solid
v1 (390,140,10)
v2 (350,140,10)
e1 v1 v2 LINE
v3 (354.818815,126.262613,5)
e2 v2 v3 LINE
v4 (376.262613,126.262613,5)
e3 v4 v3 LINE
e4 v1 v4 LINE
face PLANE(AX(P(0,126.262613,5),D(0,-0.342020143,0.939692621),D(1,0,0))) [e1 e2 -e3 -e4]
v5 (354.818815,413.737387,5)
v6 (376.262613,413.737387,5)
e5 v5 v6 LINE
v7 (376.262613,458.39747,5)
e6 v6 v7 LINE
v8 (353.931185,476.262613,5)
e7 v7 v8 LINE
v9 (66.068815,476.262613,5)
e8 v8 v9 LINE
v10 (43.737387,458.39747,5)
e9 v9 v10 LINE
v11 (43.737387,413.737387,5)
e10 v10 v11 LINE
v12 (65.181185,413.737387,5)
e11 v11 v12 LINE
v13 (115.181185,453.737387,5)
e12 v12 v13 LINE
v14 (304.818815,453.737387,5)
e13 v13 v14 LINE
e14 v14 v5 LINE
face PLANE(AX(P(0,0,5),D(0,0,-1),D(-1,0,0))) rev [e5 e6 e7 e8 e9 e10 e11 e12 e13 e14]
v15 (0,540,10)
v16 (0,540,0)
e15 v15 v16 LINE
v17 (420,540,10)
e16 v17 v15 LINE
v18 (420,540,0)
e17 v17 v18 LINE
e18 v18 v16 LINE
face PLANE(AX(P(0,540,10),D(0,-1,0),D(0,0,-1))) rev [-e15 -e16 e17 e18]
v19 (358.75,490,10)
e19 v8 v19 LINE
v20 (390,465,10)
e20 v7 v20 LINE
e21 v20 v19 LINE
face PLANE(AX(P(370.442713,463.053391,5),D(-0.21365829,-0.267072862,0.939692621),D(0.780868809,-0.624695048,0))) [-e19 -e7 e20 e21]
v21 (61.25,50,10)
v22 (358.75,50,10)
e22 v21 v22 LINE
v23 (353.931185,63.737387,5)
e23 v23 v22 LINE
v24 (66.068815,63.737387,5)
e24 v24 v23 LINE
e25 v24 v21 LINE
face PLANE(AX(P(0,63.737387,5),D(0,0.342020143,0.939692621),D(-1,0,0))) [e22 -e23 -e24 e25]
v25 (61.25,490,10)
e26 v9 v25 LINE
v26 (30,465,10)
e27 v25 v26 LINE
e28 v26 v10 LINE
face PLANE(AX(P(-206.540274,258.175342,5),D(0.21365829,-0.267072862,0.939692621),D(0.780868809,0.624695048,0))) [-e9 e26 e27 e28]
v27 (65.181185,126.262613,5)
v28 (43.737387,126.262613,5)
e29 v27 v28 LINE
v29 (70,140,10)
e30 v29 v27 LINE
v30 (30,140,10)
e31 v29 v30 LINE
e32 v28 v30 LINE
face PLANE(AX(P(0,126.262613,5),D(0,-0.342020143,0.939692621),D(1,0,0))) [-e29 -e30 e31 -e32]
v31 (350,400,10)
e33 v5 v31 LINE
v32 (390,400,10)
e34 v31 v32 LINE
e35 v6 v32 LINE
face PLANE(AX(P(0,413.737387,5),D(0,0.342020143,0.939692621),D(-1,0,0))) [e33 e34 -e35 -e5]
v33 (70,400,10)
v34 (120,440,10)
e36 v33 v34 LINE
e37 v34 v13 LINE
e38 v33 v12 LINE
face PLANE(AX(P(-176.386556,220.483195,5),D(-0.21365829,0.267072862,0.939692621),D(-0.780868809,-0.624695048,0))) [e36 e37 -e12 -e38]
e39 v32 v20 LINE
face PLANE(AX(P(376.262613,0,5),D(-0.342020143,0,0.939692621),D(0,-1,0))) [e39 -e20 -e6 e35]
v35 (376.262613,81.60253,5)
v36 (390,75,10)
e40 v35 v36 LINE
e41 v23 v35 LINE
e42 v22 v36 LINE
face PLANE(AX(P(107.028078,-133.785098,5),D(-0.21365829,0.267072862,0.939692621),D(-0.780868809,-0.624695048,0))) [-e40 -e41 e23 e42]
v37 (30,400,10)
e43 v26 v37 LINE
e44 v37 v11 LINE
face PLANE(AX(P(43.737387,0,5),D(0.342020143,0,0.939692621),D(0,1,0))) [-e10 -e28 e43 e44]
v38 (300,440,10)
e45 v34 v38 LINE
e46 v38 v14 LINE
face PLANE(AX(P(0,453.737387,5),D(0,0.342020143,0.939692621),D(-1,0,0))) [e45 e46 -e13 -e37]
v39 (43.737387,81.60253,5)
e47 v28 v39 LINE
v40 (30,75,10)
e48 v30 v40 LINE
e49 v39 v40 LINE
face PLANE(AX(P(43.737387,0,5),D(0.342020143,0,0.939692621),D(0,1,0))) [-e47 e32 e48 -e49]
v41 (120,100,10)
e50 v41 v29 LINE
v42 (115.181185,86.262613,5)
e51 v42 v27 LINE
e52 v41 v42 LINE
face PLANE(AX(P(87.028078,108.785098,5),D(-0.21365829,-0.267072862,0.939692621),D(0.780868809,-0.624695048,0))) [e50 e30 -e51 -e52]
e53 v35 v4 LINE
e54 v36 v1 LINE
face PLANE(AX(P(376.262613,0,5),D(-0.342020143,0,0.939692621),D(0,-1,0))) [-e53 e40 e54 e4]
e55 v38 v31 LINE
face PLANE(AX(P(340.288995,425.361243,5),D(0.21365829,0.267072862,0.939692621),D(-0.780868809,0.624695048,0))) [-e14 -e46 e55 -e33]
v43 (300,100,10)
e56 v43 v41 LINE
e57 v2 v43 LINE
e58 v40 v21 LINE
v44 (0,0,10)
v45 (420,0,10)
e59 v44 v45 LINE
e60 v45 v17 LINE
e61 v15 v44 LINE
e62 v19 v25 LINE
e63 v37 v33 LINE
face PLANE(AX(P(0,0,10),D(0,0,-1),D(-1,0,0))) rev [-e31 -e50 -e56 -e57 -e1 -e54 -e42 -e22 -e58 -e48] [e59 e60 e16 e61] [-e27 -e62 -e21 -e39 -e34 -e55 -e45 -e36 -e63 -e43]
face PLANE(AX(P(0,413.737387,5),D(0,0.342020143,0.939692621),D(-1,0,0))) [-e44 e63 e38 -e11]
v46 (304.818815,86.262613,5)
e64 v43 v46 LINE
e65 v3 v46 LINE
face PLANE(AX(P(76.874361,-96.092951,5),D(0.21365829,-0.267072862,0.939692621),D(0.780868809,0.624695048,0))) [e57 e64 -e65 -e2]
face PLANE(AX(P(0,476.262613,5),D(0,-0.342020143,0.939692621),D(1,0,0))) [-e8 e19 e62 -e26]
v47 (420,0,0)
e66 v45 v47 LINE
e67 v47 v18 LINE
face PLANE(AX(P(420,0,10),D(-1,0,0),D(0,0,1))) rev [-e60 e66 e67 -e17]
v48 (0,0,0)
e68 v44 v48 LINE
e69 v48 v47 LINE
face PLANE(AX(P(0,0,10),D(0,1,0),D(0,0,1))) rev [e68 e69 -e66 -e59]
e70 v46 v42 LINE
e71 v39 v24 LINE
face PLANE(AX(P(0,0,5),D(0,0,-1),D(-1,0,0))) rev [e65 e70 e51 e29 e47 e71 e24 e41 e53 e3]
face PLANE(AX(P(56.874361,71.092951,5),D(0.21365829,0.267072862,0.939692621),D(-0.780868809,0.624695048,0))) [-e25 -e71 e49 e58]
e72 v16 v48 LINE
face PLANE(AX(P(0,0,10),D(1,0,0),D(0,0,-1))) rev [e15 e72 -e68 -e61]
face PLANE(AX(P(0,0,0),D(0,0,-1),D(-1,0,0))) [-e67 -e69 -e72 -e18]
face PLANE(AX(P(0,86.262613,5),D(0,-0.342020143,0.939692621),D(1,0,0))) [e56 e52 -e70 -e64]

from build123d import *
from OCP.BRepFilletAPI import BRepFilletAPI_MakeChamfer

# Parameters (mm, degrees)
ESQUISSE1_W             = 420
ESQUISSE1_H             = 540
BOSS_EXTRU_1_DEPTH      = 10
ENL_V_MAT_EXTRU_1_DEPTH = 5
CHANFREIN1_SIZE         = 5
CHANFREIN1_SIZE_2       = 13.737387097


with BuildPart() as part:
    # Esquisse1 → Boss.-Extru.1 (new body)
    with BuildSketch(Plane.XY):
        with Locations((210, 270)):
            Rectangle(ESQUISSE1_W, ESQUISSE1_H)
    extrude(amount=BOSS_EXTRU_1_DEPTH)

    # Esquisse2 → Enlèv. mat.-Extru.1 (cut)
    with BuildSketch(Plane.XY.offset(10)):
        Polygon((300, 100), (120, 100), (70, 140), (30, 140), (30, 75), (61.25, 50), (358.75, 50), (390, 75), (390, 140), (350, 140), align=None)
        Polygon((30, 465), (61.25, 490), (358.75, 490), (390, 465), (390, 400), (350, 400), (300, 440), (120, 440), (70, 400), (30, 400), align=None)
    extrude(amount=-ENL_V_MAT_EXTRU_1_DEPTH, mode=Mode.SUBTRACT)

    # Chanfrein1
    chanfrein1_edges_1 = [part.edges().sort_by_distance(p)[0] for p in [
        (390, 107.5, 5),
    ]]
    chanfrein1_side_1 = [part.faces().sort_by_distance(p)[0] for p in [
        (390, 107.5, 5.1),
    ]]
    chanfrein1_edges_2 = [part.edges().sort_by_distance(p)[0] for p in [
        (374.375, 62.5, 5),
    ]]
    chanfrein1_side_2 = [part.faces().sort_by_distance(p)[0] for p in [
        (374.375, 62.5, 5.1),
    ]]
    chanfrein1_edges_3 = [part.edges().sort_by_distance(p)[0] for p in [
        (210, 50, 5),
    ]]
    chanfrein1_side_3 = [part.faces().sort_by_distance(p)[0] for p in [
        (210, 50, 5.1),
    ]]
    chanfrein1_edges_4 = [part.edges().sort_by_distance(p)[0] for p in [
        (45.625, 62.5, 5),
    ]]
    chanfrein1_side_4 = [part.faces().sort_by_distance(p)[0] for p in [
        (45.625, 62.5, 5.1),
    ]]
    chanfrein1_edges_5 = [part.edges().sort_by_distance(p)[0] for p in [
        (30, 107.5, 5),
    ]]
    chanfrein1_side_5 = [part.faces().sort_by_distance(p)[0] for p in [
        (30, 107.5, 5.1),
    ]]
    chanfrein1_edges_6 = [part.edges().sort_by_distance(p)[0] for p in [
        (50, 140, 5),
    ]]
    chanfrein1_side_6 = [part.faces().sort_by_distance(p)[0] for p in [
        (50, 140, 5.1),
    ]]
    chanfrein1_edges_7 = [part.edges().sort_by_distance(p)[0] for p in [
        (95, 120, 5),
    ]]
    chanfrein1_side_7 = [part.faces().sort_by_distance(p)[0] for p in [
        (95, 120, 5.1),
    ]]
    chanfrein1_edges_8 = [part.edges().sort_by_distance(p)[0] for p in [
        (210, 100, 5),
    ]]
    chanfrein1_side_8 = [part.faces().sort_by_distance(p)[0] for p in [
        (210, 100, 5.1),
    ]]
    chanfrein1_edges_9 = [part.edges().sort_by_distance(p)[0] for p in [
        (325, 120, 5),
    ]]
    chanfrein1_side_9 = [part.faces().sort_by_distance(p)[0] for p in [
        (325, 120, 5.1),
    ]]
    chanfrein1_edges_10 = [part.edges().sort_by_distance(p)[0] for p in [
        (370, 140, 5),
    ]]
    chanfrein1_side_10 = [part.faces().sort_by_distance(p)[0] for p in [
        (370, 140, 5.1),
    ]]
    chanfrein1_edges_11 = [part.edges().sort_by_distance(p)[0] for p in [
        (45.625, 477.5, 5),
    ]]
    chanfrein1_side_11 = [part.faces().sort_by_distance(p)[0] for p in [
        (45.625, 477.5, 5.1),
    ]]
    chanfrein1_edges_12 = [part.edges().sort_by_distance(p)[0] for p in [
        (210, 490, 5),
    ]]
    chanfrein1_side_12 = [part.faces().sort_by_distance(p)[0] for p in [
        (210, 490, 5.1),
    ]]
    chanfrein1_edges_13 = [part.edges().sort_by_distance(p)[0] for p in [
        (374.375, 477.5, 5),
    ]]
    chanfrein1_side_13 = [part.faces().sort_by_distance(p)[0] for p in [
        (374.375, 477.5, 5.1),
    ]]
    chanfrein1_edges_14 = [part.edges().sort_by_distance(p)[0] for p in [
        (390, 432.5, 5),
    ]]
    chanfrein1_side_14 = [part.faces().sort_by_distance(p)[0] for p in [
        (390, 432.5, 5.1),
    ]]
    chanfrein1_edges_15 = [part.edges().sort_by_distance(p)[0] for p in [
        (370, 400, 5),
    ]]
    chanfrein1_side_15 = [part.faces().sort_by_distance(p)[0] for p in [
        (370, 400, 5.1),
    ]]
    chanfrein1_edges_16 = [part.edges().sort_by_distance(p)[0] for p in [
        (325, 420, 5),
    ]]
    chanfrein1_side_16 = [part.faces().sort_by_distance(p)[0] for p in [
        (325, 420, 5.1),
    ]]
    chanfrein1_edges_17 = [part.edges().sort_by_distance(p)[0] for p in [
        (210, 440, 5),
    ]]
    chanfrein1_side_17 = [part.faces().sort_by_distance(p)[0] for p in [
        (210, 440, 5.1),
    ]]
    chanfrein1_edges_18 = [part.edges().sort_by_distance(p)[0] for p in [
        (95, 420, 5),
    ]]
    chanfrein1_side_18 = [part.faces().sort_by_distance(p)[0] for p in [
        (95, 420, 5.1),
    ]]
    chanfrein1_edges_19 = [part.edges().sort_by_distance(p)[0] for p in [
        (50, 400, 5),
    ]]
    chanfrein1_side_19 = [part.faces().sort_by_distance(p)[0] for p in [
        (50, 400, 5.1),
    ]]
    chanfrein1_edges_20 = [part.edges().sort_by_distance(p)[0] for p in [
        (30, 432.5, 5),
    ]]
    chanfrein1_side_20 = [part.faces().sort_by_distance(p)[0] for p in [
        (30, 432.5, 5.1),
    ]]
    chanfrein1 = BRepFilletAPI_MakeChamfer(part.part.solid().wrapped)
    for e in chanfrein1_edges_1:
        chanfrein1.Add(CHANFREIN1_SIZE - 0.0001, CHANFREIN1_SIZE_2 - 0.0001, e.wrapped, chanfrein1_side_1[0].wrapped)
    for e in chanfrein1_edges_2:
        chanfrein1.Add(CHANFREIN1_SIZE - 0.0001, CHANFREIN1_SIZE_2 - 0.0001, e.wrapped, chanfrein1_side_2[0].wrapped)
    for e in chanfrein1_edges_3:
        chanfrein1.Add(CHANFREIN1_SIZE - 0.0001, CHANFREIN1_SIZE_2 - 0.0001, e.wrapped, chanfrein1_side_3[0].wrapped)
    for e in chanfrein1_edges_4:
        chanfrein1.Add(CHANFREIN1_SIZE - 0.0001, CHANFREIN1_SIZE_2 - 0.0001, e.wrapped, chanfrein1_side_4[0].wrapped)
    for e in chanfrein1_edges_5:
        chanfrein1.Add(CHANFREIN1_SIZE - 0.0001, CHANFREIN1_SIZE_2 - 0.0001, e.wrapped, chanfrein1_side_5[0].wrapped)
    for e in chanfrein1_edges_6:
        chanfrein1.Add(CHANFREIN1_SIZE - 0.0001, CHANFREIN1_SIZE_2 - 0.0001, e.wrapped, chanfrein1_side_6[0].wrapped)
    for e in chanfrein1_edges_7:
        chanfrein1.Add(CHANFREIN1_SIZE - 0.0001, CHANFREIN1_SIZE_2 - 0.0001, e.wrapped, chanfrein1_side_7[0].wrapped)
    for e in chanfrein1_edges_8:
        chanfrein1.Add(CHANFREIN1_SIZE - 0.0001, CHANFREIN1_SIZE_2 - 0.0001, e.wrapped, chanfrein1_side_8[0].wrapped)
    for e in chanfrein1_edges_9:
        chanfrein1.Add(CHANFREIN1_SIZE - 0.0001, CHANFREIN1_SIZE_2 - 0.0001, e.wrapped, chanfrein1_side_9[0].wrapped)
    for e in chanfrein1_edges_10:
        chanfrein1.Add(CHANFREIN1_SIZE - 0.0001, CHANFREIN1_SIZE_2 - 0.0001, e.wrapped, chanfrein1_side_10[0].wrapped)
    for e in chanfrein1_edges_11:
        chanfrein1.Add(CHANFREIN1_SIZE - 0.0001, CHANFREIN1_SIZE_2 - 0.0001, e.wrapped, chanfrein1_side_11[0].wrapped)
    for e in chanfrein1_edges_12:
        chanfrein1.Add(CHANFREIN1_SIZE - 0.0001, CHANFREIN1_SIZE_2 - 0.0001, e.wrapped, chanfrein1_side_12[0].wrapped)
    for e in chanfrein1_edges_13:
        chanfrein1.Add(CHANFREIN1_SIZE - 0.0001, CHANFREIN1_SIZE_2 - 0.0001, e.wrapped, chanfrein1_side_13[0].wrapped)
    for e in chanfrein1_edges_14:
        chanfrein1.Add(CHANFREIN1_SIZE - 0.0001, CHANFREIN1_SIZE_2 - 0.0001, e.wrapped, chanfrein1_side_14[0].wrapped)
    for e in chanfrein1_edges_15:
        chanfrein1.Add(CHANFREIN1_SIZE - 0.0001, CHANFREIN1_SIZE_2 - 0.0001, e.wrapped, chanfrein1_side_15[0].wrapped)
    for e in chanfrein1_edges_16:
        chanfrein1.Add(CHANFREIN1_SIZE - 0.0001, CHANFREIN1_SIZE_2 - 0.0001, e.wrapped, chanfrein1_side_16[0].wrapped)
    for e in chanfrein1_edges_17:
        chanfrein1.Add(CHANFREIN1_SIZE - 0.0001, CHANFREIN1_SIZE_2 - 0.0001, e.wrapped, chanfrein1_side_17[0].wrapped)
    for e in chanfrein1_edges_18:
        chanfrein1.Add(CHANFREIN1_SIZE - 0.0001, CHANFREIN1_SIZE_2 - 0.0001, e.wrapped, chanfrein1_side_18[0].wrapped)
    for e in chanfrein1_edges_19:
        chanfrein1.Add(CHANFREIN1_SIZE - 0.0001, CHANFREIN1_SIZE_2 - 0.0001, e.wrapped, chanfrein1_side_19[0].wrapped)
    for e in chanfrein1_edges_20:
        chanfrein1.Add(CHANFREIN1_SIZE - 0.0001, CHANFREIN1_SIZE_2 - 0.0001, e.wrapped, chanfrein1_side_20[0].wrapped)
    add(Compound.cast(chanfrein1.Shape()), mode=Mode.REPLACE)  # a hair under: the kernel refuses the full size


solid = part.part
